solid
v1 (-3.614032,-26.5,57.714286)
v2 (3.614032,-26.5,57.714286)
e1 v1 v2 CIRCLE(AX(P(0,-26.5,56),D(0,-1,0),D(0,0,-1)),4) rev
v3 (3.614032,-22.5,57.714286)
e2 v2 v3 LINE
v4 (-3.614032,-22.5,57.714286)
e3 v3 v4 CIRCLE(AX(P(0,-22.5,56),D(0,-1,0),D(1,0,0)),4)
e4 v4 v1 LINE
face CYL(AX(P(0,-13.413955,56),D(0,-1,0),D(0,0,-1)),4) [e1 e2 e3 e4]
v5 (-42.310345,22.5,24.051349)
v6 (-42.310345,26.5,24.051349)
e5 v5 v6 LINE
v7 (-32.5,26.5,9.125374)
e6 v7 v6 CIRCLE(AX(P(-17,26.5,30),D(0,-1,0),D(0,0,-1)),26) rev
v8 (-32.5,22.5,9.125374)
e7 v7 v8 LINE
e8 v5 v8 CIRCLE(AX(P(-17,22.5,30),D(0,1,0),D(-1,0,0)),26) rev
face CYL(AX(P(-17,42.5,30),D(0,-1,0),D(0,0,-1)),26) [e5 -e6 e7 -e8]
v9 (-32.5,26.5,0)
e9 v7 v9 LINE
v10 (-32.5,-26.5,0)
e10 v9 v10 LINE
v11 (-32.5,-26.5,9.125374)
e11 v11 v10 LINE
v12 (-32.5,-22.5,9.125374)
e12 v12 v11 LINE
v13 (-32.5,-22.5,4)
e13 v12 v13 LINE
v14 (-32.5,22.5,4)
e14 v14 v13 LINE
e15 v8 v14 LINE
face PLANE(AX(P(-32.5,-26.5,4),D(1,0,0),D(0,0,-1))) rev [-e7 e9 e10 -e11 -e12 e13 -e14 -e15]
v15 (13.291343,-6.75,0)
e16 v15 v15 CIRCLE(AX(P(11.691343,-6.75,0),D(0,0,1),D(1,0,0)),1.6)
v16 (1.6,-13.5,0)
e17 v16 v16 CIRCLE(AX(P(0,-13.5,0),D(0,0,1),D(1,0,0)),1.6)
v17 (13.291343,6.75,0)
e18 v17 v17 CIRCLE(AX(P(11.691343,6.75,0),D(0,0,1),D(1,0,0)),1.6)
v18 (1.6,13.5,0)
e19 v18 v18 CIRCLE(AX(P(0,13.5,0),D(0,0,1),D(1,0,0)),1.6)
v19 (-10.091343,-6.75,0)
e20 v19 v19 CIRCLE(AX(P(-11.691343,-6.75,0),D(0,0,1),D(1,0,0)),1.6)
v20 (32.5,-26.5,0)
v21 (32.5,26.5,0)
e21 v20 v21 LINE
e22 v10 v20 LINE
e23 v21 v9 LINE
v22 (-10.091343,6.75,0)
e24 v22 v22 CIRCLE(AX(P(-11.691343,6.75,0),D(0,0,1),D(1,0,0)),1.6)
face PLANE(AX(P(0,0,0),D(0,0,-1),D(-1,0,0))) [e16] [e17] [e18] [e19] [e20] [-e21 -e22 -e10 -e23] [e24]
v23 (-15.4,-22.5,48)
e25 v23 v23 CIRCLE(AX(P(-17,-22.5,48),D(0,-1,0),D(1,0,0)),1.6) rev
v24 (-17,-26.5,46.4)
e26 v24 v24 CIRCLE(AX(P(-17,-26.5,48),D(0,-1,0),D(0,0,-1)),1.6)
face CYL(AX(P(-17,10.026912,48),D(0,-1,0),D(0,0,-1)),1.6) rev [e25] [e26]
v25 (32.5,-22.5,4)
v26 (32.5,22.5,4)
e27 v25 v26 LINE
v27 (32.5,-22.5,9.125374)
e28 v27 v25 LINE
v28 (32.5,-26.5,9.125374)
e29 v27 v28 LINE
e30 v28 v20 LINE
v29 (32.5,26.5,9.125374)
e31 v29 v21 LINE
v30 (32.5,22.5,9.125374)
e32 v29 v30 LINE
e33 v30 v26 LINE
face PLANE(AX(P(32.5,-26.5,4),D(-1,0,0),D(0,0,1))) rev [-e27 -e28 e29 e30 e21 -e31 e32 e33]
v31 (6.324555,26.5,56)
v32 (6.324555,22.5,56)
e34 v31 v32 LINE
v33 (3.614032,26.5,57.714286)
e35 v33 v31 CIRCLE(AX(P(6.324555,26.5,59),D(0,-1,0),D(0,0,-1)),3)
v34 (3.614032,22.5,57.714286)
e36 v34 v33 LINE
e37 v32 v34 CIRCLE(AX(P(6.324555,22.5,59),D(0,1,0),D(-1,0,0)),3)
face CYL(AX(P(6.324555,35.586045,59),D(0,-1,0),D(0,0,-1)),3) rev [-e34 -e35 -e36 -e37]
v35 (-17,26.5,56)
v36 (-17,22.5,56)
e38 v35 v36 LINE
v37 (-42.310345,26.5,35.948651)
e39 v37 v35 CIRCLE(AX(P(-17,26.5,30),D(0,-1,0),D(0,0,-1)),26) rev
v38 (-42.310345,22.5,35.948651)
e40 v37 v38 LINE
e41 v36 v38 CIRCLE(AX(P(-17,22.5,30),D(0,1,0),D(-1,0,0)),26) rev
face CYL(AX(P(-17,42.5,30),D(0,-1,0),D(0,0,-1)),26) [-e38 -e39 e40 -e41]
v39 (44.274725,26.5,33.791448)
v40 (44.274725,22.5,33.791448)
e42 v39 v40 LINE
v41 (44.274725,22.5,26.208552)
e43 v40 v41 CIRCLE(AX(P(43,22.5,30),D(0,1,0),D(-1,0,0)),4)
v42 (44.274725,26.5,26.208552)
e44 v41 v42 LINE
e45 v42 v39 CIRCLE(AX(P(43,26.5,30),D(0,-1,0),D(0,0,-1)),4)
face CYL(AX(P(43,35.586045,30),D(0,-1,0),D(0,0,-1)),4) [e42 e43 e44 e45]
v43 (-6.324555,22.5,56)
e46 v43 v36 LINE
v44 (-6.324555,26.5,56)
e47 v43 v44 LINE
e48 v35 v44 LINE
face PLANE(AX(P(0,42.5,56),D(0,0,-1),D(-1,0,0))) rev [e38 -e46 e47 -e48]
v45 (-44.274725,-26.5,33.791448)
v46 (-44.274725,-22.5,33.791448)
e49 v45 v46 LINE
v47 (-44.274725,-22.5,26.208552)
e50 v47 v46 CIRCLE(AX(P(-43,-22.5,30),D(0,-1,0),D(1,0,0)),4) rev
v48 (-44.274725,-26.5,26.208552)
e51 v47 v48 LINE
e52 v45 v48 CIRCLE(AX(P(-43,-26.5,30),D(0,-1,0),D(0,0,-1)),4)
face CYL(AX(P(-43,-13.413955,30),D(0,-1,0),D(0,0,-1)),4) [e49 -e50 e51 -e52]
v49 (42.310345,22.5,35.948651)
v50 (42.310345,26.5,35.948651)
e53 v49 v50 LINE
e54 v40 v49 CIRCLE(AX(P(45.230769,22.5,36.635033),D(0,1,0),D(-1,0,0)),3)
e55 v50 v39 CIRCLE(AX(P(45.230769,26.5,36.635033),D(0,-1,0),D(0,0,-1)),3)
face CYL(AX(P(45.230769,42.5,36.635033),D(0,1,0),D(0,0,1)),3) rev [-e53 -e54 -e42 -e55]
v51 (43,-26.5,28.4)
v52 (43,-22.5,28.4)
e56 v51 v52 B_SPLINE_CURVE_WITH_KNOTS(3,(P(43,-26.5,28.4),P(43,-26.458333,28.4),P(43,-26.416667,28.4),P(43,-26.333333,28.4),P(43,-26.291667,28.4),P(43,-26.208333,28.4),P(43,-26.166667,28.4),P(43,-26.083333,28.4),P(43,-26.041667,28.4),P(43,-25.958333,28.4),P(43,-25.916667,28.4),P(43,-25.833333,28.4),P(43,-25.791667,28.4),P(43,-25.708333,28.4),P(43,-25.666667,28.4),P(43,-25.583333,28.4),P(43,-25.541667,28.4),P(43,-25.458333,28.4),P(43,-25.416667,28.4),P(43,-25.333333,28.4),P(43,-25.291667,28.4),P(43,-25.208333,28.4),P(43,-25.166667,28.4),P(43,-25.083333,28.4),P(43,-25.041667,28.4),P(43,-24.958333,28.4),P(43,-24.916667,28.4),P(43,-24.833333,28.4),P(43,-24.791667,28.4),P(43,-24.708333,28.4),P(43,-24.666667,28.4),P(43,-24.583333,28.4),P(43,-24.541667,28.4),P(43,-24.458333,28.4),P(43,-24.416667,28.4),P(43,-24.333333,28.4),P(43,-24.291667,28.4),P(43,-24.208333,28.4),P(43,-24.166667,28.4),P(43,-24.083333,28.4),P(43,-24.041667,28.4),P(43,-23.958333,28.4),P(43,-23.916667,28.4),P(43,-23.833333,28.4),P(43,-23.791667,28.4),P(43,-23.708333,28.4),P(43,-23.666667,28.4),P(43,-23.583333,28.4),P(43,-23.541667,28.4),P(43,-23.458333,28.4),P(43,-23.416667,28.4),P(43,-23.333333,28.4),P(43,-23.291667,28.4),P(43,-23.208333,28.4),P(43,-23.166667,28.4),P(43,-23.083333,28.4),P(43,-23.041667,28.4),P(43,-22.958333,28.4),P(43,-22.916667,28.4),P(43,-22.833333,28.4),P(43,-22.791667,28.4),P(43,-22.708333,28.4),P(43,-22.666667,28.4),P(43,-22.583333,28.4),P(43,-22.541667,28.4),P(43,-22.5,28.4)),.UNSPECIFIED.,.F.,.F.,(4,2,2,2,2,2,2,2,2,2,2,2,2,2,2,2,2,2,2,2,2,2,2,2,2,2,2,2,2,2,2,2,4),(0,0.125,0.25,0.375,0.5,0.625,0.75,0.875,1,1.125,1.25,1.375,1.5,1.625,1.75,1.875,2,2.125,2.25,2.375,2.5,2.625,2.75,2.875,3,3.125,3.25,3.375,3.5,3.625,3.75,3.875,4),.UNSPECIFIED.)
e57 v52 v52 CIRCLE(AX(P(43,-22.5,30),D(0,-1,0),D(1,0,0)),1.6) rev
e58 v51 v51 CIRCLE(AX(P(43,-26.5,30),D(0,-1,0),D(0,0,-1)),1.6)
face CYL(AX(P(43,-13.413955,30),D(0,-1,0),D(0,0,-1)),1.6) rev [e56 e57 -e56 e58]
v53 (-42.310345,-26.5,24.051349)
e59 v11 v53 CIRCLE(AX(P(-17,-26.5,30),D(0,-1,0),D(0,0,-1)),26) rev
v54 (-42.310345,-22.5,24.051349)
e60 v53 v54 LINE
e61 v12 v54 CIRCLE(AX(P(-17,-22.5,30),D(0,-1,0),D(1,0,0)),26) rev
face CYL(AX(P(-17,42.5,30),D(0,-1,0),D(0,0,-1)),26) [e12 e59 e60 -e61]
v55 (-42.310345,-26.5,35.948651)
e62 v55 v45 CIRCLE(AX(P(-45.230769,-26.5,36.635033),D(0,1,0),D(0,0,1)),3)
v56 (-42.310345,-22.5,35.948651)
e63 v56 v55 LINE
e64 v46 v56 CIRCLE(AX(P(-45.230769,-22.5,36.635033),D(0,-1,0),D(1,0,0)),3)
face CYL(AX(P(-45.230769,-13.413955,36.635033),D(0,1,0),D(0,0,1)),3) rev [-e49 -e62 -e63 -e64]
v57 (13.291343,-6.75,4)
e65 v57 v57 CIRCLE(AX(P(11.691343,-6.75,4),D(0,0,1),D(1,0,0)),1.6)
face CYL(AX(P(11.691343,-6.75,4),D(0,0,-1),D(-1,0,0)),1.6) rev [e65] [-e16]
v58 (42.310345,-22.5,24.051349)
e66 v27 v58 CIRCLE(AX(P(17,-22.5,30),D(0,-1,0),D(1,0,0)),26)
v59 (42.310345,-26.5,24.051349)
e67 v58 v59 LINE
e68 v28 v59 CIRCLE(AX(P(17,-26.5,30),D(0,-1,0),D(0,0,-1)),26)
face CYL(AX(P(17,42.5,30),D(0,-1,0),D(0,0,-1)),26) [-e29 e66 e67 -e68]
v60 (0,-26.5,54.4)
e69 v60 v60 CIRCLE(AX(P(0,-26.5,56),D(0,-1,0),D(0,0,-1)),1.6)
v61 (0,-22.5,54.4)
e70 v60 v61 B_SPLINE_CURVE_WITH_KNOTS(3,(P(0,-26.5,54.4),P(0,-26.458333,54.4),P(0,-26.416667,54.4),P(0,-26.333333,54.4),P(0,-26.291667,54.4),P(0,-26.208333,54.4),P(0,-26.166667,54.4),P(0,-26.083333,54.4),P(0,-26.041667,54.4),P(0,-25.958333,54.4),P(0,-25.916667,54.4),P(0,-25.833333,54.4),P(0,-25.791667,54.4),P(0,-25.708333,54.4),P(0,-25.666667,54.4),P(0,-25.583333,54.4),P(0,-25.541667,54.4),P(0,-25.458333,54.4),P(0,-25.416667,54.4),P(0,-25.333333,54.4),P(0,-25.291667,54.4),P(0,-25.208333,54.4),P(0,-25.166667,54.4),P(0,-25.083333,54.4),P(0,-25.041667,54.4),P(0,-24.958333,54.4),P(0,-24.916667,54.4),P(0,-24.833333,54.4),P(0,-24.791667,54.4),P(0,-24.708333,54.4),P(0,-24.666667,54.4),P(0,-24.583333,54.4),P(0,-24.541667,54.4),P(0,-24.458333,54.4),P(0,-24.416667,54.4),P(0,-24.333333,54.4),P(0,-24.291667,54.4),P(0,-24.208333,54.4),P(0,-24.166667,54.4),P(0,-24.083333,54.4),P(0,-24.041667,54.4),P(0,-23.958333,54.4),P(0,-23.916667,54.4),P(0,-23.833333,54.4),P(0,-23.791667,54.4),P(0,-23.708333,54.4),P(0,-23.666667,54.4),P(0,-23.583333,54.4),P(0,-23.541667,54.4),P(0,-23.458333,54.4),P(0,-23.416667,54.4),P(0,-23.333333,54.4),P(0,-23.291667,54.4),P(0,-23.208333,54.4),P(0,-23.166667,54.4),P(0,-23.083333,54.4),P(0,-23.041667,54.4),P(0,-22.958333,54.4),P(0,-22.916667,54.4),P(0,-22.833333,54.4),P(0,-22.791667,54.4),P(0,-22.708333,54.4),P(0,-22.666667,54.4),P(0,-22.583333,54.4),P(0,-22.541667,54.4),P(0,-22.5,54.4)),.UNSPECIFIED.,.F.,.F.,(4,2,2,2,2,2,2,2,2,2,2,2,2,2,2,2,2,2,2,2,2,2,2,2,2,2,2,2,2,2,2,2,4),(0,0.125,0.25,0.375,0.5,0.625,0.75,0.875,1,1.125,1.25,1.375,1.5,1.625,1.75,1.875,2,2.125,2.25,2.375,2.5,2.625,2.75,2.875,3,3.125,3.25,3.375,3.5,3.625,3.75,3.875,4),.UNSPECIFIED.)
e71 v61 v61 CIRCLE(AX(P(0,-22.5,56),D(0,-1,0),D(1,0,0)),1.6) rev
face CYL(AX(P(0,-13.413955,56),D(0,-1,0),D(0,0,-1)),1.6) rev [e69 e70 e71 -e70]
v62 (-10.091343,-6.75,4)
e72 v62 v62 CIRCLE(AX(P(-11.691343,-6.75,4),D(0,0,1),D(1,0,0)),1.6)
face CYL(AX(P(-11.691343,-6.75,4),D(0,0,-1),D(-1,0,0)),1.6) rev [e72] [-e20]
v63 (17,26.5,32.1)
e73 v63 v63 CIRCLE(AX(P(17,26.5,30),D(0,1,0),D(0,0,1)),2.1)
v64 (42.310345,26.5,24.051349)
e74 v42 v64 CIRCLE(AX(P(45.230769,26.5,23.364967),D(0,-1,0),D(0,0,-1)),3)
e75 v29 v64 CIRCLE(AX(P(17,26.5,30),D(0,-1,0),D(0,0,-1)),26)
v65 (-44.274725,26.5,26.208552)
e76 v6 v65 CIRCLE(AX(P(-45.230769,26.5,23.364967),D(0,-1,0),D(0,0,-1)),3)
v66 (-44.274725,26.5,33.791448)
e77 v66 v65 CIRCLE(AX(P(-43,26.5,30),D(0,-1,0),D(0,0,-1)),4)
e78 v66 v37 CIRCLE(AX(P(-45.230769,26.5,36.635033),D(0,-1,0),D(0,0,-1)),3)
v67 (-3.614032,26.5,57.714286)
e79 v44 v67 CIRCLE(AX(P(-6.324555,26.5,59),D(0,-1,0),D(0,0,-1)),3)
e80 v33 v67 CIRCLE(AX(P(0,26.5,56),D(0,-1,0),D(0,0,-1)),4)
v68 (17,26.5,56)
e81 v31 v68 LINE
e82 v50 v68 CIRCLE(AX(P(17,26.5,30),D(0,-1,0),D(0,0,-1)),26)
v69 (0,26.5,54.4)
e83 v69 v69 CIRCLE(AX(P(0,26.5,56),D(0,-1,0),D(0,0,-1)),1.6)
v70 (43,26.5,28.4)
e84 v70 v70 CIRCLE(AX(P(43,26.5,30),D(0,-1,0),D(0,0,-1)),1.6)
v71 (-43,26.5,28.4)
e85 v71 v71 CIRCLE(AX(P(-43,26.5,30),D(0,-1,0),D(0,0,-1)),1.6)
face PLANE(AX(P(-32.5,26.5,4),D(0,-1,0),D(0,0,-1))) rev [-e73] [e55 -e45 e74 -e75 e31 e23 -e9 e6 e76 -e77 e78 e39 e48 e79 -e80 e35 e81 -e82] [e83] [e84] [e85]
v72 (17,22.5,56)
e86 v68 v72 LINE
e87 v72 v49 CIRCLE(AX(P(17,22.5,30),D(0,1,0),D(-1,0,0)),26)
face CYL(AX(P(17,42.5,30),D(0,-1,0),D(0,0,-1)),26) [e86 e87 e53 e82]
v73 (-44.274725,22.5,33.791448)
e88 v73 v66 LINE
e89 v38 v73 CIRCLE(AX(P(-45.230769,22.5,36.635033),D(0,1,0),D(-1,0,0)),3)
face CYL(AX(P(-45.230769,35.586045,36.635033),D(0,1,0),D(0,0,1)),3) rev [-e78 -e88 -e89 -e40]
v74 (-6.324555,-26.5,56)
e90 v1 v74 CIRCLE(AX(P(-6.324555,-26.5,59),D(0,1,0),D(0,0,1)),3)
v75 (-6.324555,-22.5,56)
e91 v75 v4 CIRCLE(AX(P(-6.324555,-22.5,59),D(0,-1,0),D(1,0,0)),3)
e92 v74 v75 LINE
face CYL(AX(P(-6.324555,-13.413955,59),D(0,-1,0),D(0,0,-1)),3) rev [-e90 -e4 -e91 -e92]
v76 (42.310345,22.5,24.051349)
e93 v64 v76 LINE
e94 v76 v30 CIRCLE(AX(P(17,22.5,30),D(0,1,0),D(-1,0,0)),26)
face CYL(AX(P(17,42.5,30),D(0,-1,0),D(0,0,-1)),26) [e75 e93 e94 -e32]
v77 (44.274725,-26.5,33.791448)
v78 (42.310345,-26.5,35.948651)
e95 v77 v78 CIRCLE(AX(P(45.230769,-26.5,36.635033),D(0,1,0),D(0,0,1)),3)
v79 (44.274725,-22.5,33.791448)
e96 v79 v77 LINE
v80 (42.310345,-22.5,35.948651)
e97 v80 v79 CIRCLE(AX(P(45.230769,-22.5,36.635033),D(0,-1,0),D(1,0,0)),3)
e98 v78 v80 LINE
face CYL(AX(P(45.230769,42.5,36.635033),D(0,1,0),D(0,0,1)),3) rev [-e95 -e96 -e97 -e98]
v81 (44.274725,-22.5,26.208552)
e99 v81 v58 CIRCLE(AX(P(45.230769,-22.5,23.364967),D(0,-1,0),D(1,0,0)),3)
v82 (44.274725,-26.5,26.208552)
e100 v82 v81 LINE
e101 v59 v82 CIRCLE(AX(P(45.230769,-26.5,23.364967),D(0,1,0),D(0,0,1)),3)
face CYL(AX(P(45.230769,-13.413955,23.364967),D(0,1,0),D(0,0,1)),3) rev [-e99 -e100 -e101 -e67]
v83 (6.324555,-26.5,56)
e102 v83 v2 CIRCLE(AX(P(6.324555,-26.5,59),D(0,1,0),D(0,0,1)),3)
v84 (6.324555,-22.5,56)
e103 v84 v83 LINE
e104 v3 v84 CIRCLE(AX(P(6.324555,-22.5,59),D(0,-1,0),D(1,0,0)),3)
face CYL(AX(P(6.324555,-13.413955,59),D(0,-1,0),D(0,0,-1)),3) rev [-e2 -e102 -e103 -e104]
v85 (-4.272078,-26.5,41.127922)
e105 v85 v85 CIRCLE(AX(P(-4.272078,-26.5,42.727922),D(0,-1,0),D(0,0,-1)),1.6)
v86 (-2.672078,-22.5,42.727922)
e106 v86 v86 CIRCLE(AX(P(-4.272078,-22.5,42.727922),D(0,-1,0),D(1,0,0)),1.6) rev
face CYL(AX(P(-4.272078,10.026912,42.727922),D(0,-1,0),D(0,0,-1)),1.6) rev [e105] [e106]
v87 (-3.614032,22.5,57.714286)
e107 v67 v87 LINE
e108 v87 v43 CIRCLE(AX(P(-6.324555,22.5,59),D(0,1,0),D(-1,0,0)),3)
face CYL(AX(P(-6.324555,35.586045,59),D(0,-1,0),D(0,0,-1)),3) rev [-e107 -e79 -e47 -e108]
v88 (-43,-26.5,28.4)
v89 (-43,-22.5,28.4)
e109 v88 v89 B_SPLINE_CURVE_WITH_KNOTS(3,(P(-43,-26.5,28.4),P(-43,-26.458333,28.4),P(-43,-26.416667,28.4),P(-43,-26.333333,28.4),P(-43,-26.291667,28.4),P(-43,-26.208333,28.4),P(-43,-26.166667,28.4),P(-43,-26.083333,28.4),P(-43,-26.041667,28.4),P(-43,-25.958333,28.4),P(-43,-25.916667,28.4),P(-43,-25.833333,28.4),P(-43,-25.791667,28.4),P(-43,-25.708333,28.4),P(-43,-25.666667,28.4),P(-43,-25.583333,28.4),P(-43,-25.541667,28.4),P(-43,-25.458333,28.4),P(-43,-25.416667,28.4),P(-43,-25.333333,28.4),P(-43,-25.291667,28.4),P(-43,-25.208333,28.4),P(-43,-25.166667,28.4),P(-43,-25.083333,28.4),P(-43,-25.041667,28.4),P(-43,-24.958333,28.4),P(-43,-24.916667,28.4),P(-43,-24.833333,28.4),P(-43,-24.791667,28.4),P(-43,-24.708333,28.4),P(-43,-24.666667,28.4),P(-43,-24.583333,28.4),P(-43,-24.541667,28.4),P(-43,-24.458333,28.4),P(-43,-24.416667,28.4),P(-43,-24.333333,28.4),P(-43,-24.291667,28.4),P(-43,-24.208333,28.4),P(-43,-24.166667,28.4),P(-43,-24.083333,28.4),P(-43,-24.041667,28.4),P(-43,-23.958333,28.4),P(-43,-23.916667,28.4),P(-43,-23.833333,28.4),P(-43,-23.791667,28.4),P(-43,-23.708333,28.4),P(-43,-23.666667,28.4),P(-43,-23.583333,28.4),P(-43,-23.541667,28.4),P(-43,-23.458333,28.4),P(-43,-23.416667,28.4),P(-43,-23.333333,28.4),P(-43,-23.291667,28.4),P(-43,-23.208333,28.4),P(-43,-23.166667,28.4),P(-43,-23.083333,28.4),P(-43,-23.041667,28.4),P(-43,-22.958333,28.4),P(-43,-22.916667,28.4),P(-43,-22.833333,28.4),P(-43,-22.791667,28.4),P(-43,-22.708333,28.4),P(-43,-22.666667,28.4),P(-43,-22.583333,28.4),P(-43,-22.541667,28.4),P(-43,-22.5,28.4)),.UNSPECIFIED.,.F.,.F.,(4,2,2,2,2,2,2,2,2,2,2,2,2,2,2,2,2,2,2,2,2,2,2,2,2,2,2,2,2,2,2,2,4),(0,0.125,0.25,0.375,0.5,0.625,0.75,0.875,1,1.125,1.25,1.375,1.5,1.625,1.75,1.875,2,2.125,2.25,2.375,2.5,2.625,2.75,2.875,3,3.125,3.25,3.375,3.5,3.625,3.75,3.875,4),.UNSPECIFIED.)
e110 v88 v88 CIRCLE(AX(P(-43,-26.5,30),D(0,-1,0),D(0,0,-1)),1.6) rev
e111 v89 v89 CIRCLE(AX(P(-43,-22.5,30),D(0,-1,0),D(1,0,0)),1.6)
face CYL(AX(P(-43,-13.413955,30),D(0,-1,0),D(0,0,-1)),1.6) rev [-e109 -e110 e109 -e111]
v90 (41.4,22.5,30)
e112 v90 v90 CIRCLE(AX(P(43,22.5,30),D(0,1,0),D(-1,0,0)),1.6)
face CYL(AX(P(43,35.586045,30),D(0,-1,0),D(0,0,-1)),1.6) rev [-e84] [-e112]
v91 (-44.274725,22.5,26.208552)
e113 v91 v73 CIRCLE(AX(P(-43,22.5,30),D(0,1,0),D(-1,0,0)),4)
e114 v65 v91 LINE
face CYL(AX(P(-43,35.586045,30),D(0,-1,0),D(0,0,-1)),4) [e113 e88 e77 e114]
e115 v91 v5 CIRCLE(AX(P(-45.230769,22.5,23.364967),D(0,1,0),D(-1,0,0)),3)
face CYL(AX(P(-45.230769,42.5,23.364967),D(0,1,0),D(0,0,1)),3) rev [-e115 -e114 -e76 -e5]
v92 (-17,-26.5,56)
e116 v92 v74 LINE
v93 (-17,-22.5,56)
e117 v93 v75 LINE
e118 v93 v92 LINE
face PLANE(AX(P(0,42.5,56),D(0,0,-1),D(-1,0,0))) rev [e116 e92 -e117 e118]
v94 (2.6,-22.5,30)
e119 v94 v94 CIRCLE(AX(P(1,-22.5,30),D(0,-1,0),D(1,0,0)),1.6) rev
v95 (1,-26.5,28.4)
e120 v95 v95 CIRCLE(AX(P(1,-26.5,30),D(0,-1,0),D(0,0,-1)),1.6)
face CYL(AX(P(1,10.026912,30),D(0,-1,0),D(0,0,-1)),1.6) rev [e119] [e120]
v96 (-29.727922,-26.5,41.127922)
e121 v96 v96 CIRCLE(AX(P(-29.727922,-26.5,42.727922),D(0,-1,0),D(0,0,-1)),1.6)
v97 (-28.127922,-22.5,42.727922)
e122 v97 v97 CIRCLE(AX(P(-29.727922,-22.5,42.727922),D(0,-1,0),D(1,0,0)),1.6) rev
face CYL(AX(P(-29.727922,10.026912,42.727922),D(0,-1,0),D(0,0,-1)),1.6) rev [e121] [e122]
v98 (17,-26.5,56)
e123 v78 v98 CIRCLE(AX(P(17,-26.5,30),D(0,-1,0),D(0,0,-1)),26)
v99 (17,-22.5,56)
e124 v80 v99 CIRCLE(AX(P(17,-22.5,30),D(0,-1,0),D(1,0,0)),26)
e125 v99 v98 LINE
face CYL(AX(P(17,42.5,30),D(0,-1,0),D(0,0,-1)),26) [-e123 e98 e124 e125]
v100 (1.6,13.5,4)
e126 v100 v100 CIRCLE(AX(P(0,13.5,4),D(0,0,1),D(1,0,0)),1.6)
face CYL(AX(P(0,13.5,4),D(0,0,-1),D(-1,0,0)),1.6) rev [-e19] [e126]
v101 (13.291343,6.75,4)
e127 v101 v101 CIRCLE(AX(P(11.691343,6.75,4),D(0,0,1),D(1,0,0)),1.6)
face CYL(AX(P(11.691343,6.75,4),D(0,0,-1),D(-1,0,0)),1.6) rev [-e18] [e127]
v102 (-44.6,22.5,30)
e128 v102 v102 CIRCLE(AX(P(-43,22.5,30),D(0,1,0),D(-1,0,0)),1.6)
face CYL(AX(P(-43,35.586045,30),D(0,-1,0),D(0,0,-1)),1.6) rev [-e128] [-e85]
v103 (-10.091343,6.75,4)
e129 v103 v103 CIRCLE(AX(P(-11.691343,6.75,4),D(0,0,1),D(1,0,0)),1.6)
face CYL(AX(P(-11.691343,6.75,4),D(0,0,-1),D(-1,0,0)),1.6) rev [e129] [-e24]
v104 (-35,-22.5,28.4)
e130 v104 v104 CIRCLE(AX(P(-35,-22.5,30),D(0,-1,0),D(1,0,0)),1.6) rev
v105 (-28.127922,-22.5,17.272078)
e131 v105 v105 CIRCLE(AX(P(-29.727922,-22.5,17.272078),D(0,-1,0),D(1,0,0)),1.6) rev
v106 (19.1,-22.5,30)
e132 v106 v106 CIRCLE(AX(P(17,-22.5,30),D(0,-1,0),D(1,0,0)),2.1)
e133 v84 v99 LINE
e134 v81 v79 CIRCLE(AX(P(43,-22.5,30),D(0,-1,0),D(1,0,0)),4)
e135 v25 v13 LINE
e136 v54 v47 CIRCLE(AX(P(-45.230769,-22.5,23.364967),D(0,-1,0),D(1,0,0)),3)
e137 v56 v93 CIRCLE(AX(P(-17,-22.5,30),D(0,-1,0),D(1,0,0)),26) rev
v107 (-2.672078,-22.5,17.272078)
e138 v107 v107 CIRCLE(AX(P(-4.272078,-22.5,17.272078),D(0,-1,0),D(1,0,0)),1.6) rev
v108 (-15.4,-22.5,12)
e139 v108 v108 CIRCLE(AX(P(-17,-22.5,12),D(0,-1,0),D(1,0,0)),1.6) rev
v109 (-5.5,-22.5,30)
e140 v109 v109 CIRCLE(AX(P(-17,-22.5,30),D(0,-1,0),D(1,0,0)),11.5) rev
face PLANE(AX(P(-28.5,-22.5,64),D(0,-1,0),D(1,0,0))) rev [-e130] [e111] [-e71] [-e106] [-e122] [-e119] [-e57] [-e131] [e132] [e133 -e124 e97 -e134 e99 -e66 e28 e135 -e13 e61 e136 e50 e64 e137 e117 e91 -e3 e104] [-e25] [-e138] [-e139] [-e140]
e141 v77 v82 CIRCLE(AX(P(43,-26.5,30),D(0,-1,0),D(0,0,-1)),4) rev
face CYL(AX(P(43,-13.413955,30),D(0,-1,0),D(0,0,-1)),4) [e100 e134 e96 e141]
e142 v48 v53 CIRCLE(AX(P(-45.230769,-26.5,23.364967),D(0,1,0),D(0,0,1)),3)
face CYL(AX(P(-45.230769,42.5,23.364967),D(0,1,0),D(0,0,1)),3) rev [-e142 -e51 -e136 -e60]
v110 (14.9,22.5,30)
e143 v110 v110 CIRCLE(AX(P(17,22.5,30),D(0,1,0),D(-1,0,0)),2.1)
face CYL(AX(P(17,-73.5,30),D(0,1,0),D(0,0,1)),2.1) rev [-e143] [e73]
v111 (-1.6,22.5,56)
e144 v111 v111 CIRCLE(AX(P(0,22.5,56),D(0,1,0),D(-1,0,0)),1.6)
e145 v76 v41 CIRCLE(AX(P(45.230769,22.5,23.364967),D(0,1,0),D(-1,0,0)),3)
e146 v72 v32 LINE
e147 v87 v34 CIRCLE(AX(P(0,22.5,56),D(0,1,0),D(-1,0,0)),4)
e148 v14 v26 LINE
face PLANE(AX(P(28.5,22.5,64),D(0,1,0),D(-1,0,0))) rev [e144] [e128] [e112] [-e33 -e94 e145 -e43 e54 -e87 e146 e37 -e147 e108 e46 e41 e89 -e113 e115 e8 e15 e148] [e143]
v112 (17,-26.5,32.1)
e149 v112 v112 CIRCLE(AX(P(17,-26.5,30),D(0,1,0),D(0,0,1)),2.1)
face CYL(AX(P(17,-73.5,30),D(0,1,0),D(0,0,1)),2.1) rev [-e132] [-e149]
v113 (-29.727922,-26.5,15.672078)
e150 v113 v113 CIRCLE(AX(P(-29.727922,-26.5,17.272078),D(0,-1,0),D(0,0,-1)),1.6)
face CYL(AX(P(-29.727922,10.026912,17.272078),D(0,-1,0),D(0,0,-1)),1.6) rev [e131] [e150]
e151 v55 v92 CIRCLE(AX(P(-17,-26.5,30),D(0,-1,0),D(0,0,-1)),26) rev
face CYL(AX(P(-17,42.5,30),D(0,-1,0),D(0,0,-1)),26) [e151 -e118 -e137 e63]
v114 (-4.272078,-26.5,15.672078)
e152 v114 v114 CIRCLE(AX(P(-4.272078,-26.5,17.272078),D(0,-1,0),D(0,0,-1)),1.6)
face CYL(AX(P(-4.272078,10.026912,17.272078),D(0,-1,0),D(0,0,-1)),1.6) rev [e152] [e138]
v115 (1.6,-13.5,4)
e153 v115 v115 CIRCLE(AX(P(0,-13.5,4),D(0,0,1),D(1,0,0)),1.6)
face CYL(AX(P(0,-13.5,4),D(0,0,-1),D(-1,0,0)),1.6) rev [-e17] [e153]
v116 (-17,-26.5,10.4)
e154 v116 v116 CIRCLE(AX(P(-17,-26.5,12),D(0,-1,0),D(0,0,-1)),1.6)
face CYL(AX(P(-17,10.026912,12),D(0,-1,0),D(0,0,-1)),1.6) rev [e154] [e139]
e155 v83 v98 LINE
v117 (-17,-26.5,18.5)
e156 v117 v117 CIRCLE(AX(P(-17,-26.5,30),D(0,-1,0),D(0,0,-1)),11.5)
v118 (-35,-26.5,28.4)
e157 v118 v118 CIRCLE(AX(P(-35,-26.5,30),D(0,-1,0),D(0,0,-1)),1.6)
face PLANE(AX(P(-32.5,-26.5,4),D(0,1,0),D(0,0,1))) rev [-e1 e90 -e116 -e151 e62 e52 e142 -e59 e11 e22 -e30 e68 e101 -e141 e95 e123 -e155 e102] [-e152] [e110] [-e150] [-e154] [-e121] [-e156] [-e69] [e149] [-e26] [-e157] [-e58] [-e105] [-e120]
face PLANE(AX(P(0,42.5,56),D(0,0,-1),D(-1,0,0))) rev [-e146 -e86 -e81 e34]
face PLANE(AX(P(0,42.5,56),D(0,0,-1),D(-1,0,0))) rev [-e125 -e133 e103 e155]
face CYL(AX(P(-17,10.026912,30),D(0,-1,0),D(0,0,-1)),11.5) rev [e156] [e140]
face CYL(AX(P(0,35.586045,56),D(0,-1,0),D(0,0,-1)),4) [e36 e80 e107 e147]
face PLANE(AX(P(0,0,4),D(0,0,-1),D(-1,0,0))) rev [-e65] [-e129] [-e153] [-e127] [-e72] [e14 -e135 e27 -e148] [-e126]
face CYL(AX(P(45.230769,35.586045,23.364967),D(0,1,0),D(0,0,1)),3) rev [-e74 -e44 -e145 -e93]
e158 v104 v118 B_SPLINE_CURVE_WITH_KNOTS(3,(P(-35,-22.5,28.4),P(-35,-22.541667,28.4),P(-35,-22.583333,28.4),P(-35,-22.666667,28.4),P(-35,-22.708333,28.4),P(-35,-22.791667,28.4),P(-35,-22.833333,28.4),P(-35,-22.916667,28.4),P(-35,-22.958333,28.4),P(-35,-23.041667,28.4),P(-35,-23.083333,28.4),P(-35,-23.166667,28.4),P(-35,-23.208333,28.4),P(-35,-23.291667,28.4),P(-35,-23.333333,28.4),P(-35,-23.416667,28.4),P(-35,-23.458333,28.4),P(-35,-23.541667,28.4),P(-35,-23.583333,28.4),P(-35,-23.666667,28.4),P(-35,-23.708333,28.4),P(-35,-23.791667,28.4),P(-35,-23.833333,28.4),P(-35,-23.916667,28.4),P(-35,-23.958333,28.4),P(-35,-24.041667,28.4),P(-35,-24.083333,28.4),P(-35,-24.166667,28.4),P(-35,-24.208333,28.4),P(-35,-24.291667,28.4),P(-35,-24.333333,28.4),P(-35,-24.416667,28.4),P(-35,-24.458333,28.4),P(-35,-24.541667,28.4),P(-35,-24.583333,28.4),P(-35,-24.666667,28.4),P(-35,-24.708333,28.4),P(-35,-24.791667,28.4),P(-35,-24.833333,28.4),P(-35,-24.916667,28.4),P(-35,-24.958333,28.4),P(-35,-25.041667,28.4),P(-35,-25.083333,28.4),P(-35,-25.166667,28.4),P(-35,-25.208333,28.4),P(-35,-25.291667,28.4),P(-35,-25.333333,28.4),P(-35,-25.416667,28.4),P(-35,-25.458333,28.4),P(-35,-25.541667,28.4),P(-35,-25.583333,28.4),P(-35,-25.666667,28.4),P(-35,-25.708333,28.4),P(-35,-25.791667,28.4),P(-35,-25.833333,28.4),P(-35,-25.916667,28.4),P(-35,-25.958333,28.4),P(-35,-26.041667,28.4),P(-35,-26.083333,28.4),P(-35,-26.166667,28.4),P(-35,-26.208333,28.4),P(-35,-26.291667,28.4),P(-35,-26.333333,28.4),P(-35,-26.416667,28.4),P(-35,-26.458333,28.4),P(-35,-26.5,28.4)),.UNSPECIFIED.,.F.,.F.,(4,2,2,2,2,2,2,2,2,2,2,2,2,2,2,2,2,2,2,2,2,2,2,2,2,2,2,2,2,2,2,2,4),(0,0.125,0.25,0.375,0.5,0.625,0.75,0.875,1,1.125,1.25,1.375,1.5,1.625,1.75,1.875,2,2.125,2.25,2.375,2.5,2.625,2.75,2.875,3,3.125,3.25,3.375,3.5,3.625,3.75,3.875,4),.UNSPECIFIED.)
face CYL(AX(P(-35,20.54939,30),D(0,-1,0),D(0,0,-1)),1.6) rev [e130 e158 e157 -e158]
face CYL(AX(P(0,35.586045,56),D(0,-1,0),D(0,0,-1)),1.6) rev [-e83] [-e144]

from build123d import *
from build123d.topology import SkipClean

# Parameters (mm, degrees)
SKETCH_1_W          = 65
SKETCH_1_H          = 53
SKETCH_1_R          = 1.6
EXTRUDE_1_DEPTH     = 4
EXTRUDE_2_DEPTH     = 60
SKETCH_5_R          = 1.6
SKETCH_5_R_2        = 11.5
CUT_EXTRUDE_1_DEPTH = 4
CUT_EXTRUDE_2_DEPTH = 69
SKETCH_6_3_R        = 1.6
EXTRUDE_3_DEPTH     = 4
EXTRUDE_START       = -53
EXTRUDE_4_DEPTH     = 4
SKETCH_7_R          = 2.1
CUT_EXTRUDE_3_DEPTH = 100
EXTRUDE_6_DEPTH     = 4
EXTRUDE_START_2     = -49
EXTRUDE_7_DEPTH     = 4
CUT_EXTRUDE_4_DEPTH = 70
FILLET_1_R          = 3


# Read off the part's stored shape, not the designer's step: 凸台-拉伸4
with BuildPart() as part:
    # 草图1 → 凸台-拉伸1 (new body)
    with BuildSketch(Plane.XY):
        Rectangle(SKETCH_1_W, SKETCH_1_H)
        with Locations((0, 13.5)):
            Circle(SKETCH_1_R, mode=Mode.SUBTRACT)
        with Locations((11.691342951, 6.75)):
            Circle(SKETCH_1_R, mode=Mode.SUBTRACT)
        with Locations((11.691342951, -6.75)):
            Circle(SKETCH_1_R, mode=Mode.SUBTRACT)
        with Locations((0, -13.5)):
            Circle(SKETCH_1_R, mode=Mode.SUBTRACT)
        with Locations((-11.691342951, -6.75)):
            Circle(SKETCH_1_R, mode=Mode.SUBTRACT)
        with Locations((-11.691342951, 6.75)):
            Circle(SKETCH_1_R, mode=Mode.SUBTRACT)
    extrude(amount=EXTRUDE_1_DEPTH)

    # 草图3 → 凸台-拉伸2 (add)
    with BuildSketch(Plane.XY.offset(4)):
        Polygon((28.5, 22.5), (-28.5, 22.5), (-32.5, 22.5), (-32.5, 26.5), (32.5, 26.5), (32.5, 22.5), align=None)
        Polygon((-28.5, -22.5), (28.5, -22.5), (32.5, -22.5), (32.5, -26.5), (-32.5, -26.5), (-32.5, -22.5), align=None)
    extrude(amount=EXTRUDE_2_DEPTH)

    # 草图5 → 切除-拉伸1 (cut)
    with BuildSketch(Plane.XZ.offset(26.5)):
        with Locations(Location((-17, 48, 0), (0, 0, 270))):
            Circle(SKETCH_5_R)
        with Locations(Location((-17, 30, 0), (0, 0, 270))):
            Circle(SKETCH_5_R_2)
        with Locations(Location((-4.272077939, 42.727922061, 0), (0, 0, 270))):
            Circle(SKETCH_5_R)
        with Locations(Location((1, 30, 0), (0, 0, 270))):
            Circle(SKETCH_5_R)
        with Locations(Location((-4.272077939, 17.272077939, 0), (0, 0, 270))):
            Circle(SKETCH_5_R)
        with Locations(Location((-17, 12, 0), (0, 0, 270))):
            Circle(SKETCH_5_R)
        with Locations(Location((-29.727922061, 17.272077939, 0), (0, 0, 270))):
            Circle(SKETCH_5_R)
        with Locations((-35, 30)):
            Circle(SKETCH_5_R)
        with Locations(Location((-29.727922061, 42.727922061, 0), (0, 0, 270))):
            Circle(SKETCH_5_R)
    extrude(amount=-CUT_EXTRUDE_1_DEPTH, mode=Mode.SUBTRACT)

    # 草图6 → 切除-拉伸2 (cut)
    with BuildSketch(Plane.XZ.offset(26.5)):
        with BuildLine():
            ThreePointArc((-32.5, 50.874625745), (-25.162711885, 54.685423527), (-17, 56))
            Line((-17, 56), (17, 56))
            ThreePointArc((17, 56), (25.162711885, 54.685423527), (32.5, 50.874625745))
            Line((32.5, 50.874625745), (32.5, 64))
            Line((32.5, 64), (-32.5, 64))
            Line((-32.5, 64), (-32.5, 50.874625745))
        make_face()
    extrude(amount=-CUT_EXTRUDE_2_DEPTH, mode=Mode.SUBTRACT)

    # 草图6<3> → 凸台-拉伸3 (add)
    # profile 1 of 2: a face of its own
    with BuildSketch(Plane.XZ.offset(26.5)):
        with BuildLine():
            Line((-32.5, 9.125374255), (-32.5, 50.874625745))
            ThreePointArc((-32.5, 50.874625745), (-43, 30), (-32.5, 9.125374255))
        make_face()
        with Locations(Location((-35, 30, 0), (0, 0, 270))):
            Circle(SKETCH_6_3_R, mode=Mode.SUBTRACT)
    # profile 2 of 2: a face of its own
    with BuildSketch(Plane.XZ.offset(26.5)):
        with BuildLine():
            ThreePointArc((32.5, 9.125374255), (43, 30), (32.5, 50.874625745))
            Line((32.5, 50.874625745), (32.5, 9.125374255))
        make_face()
    extrude(amount=-EXTRUDE_3_DEPTH)

    # 凸台-拉伸4 outline → 凸台-拉伸4 (add)
    with BuildSketch(Plane.XZ.offset(26.5).offset(EXTRUDE_START)):
        with BuildLine():
            Line((-32.5, 9.125374255), (-32.5, 50.874625745))
            ThreePointArc((-32.5, 50.874625745), (-43, 30), (-32.5, 9.125374255))
        make_face()
        with BuildLine():
            Line((32.5, 50.874625745), (32.5, 9.125374255))
            ThreePointArc((32.5, 9.125374255), (43, 30), (32.5, 50.874625745))
        make_face()
    extrude(amount=EXTRUDE_4_DEPTH)

    # 草图7 → 切除-拉伸3 (cut)
    with BuildSketch(Plane(origin=(0, 26.5, 0), x_dir=(1, 0, 0), z_dir=(0, 1, 0))):
        with Locations(Location((17, -30, 0), (0, 0, 270))):
            Circle(SKETCH_7_R)
    extrude(amount=-CUT_EXTRUDE_3_DEPTH, mode=Mode.SUBTRACT)

    # 草图8 → 凸台-拉伸6 (add)
    with BuildSketch(Plane.XZ.offset(26.5)):
        with BuildLine():
            ThreePointArc((4, 56), (0, 60), (-4, 56))
            Line((-4, 56), (-1.6, 56))
            ThreePointArc((-1.6, 56), (0, 57.6), (1.6, 56))
            Line((1.6, 56), (4, 56))
        make_face()
        with BuildLine():
            ThreePointArc((-42.950769231, 31.599242424), (-42.849150201, 32.796682655), (-42.692307692, 33.988148122))
            ThreePointArc((-42.692307692, 33.988148122), (-47, 30), (-42.692307692, 26.011851878))
            ThreePointArc((-42.692307692, 26.011851878), (-42.849150201, 27.203317345), (-42.950769231, 28.400757576))
            ThreePointArc((-42.950769231, 28.400757576), (-44.6, 30), (-42.950769231, 31.599242424))
        make_face()
        with BuildLine():
            ThreePointArc((42.692307692, 26.011851878), (47, 30), (42.692307692, 33.988148122))
            ThreePointArc((42.692307692, 33.988148122), (42.849150201, 32.796682655), (42.950769231, 31.599242424))
            ThreePointArc((42.950769231, 31.599242424), (44.113829154, 31.148644686), (44.6, 30))
            ThreePointArc((44.6, 30), (44.113829154, 28.851355314), (42.950769231, 28.400757576))
            ThreePointArc((42.950769231, 28.400757576), (42.849150201, 27.203317345), (42.692307692, 26.011851878))
        make_face()
    extrude(amount=-EXTRUDE_6_DEPTH)

    # 草图8<4> → 凸台-拉伸7 (add)
    with BuildSketch(Plane.XZ.offset(26.5).offset(EXTRUDE_START_2)):
        with BuildLine():
            ThreePointArc((4, 56), (0, 60), (-4, 56))
            Line((-4, 56), (-1.6, 56))
            ThreePointArc((-1.6, 56), (0, 57.6), (1.6, 56))
            Line((1.6, 56), (4, 56))
        make_face()
        with BuildLine():
            ThreePointArc((42.692307692, 26.011851878), (47, 30), (42.692307692, 33.988148122))
            ThreePointArc((42.692307692, 33.988148122), (42.849150201, 32.796682655), (42.950769231, 31.599242424))
            ThreePointArc((42.950769231, 31.599242424), (44.113829154, 31.148644686), (44.6, 30))
            ThreePointArc((44.6, 30), (44.113829154, 28.851355314), (42.950769231, 28.400757576))
            ThreePointArc((42.950769231, 28.400757576), (42.849150201, 27.203317345), (42.692307692, 26.011851878))
        make_face()
        with BuildLine():
            ThreePointArc((-42.950769231, 31.599242424), (-42.849150201, 32.796682655), (-42.692307692, 33.988148122))
            ThreePointArc((-42.692307692, 33.988148122), (-47, 30), (-42.692307692, 26.011851878))
            ThreePointArc((-42.692307692, 26.011851878), (-42.849150201, 27.203317345), (-42.950769231, 28.400757576))
            ThreePointArc((-42.950769231, 28.400757576), (-44.6, 30), (-42.950769231, 31.599242424))
        make_face()
    extrude(amount=-EXTRUDE_7_DEPTH)

    # 草图8<5> → 切除-拉伸4 (cut)
    with SkipClean():  # the faces are left unmerged after this step: merging them gives an invalid solid
        with BuildSketch(Plane.XZ.offset(26.5)):
            with BuildLine():
                Line((0, 56), (-1.6, 56))
                ThreePointArc((-1.6, 56), (-1.13137085, 54.86862915), (0, 54.4))
                Line((0, 54.4), (0, 56))
            make_face()
            with BuildLine():
                ThreePointArc((0, 54.4), (1.13137085, 54.86862915), (1.6, 56))
                Line((1.6, 56), (0, 56))
                Line((0, 56), (0, 54.4))
            make_face()
            with BuildLine():
                ThreePointArc((42.950769231, 28.400757576), (43, 30), (42.950769231, 31.599242424))
                ThreePointArc((42.950769231, 31.599242424), (41.4, 30), (42.950769231, 28.400757576))
            make_face()
            with BuildLine():
                ThreePointArc((44.6, 30), (44.113829154, 31.148644686), (42.950769231, 31.599242424))
                ThreePointArc((42.950769231, 31.599242424), (43, 30), (42.950769231, 28.400757576))
                ThreePointArc((42.950769231, 28.400757576), (44.113829154, 28.851355314), (44.6, 30))
            make_face()
            with BuildLine():
                ThreePointArc((-42.950769231, 28.400757576), (-43, 30), (-42.950769231, 31.599242424))
                ThreePointArc((-42.950769231, 31.599242424), (-44.6, 30), (-42.950769231, 28.400757576))
            make_face()
            with BuildLine():
                ThreePointArc((-41.4, 30), (-41.851355314, 31.113829154), (-42.950769231, 31.599242424))
                ThreePointArc((-42.950769231, 31.599242424), (-43, 30), (-42.950769231, 28.400757576))
                ThreePointArc((-42.950769231, 28.400757576), (-41.851355314, 28.886170846), (-41.4, 30))
            make_face()
        extrude(amount=-CUT_EXTRUDE_4_DEPTH, mode=Mode.SUBTRACT)

    # 圆角1
    fillet_1_edges = [part.edges().sort_by_distance(p)[0] for p in [
        (4, -24.5, 56),
        (-4, -24.5, 56),
        (-42.692307692, -24.5, 33.988148122),
        (-42.692307692, -24.5, 26.011851878),
        (42.692307692, -24.5, 26.011851878),
        (42.692307692, -24.5, 33.988148122),
        (-4, 24.5, 56),
        (4, 24.5, 56),
        (42.692307692, 24.5, 33.988148122),
        (42.692307692, 24.5, 26.011851878),
        (-42.692307692, 24.5, 26.011851878),
        (-42.692307692, 24.5, 33.988148122),
    ]]
    fillet(fillet_1_edges, radius=FILLET_1_R)


solid = part.part
